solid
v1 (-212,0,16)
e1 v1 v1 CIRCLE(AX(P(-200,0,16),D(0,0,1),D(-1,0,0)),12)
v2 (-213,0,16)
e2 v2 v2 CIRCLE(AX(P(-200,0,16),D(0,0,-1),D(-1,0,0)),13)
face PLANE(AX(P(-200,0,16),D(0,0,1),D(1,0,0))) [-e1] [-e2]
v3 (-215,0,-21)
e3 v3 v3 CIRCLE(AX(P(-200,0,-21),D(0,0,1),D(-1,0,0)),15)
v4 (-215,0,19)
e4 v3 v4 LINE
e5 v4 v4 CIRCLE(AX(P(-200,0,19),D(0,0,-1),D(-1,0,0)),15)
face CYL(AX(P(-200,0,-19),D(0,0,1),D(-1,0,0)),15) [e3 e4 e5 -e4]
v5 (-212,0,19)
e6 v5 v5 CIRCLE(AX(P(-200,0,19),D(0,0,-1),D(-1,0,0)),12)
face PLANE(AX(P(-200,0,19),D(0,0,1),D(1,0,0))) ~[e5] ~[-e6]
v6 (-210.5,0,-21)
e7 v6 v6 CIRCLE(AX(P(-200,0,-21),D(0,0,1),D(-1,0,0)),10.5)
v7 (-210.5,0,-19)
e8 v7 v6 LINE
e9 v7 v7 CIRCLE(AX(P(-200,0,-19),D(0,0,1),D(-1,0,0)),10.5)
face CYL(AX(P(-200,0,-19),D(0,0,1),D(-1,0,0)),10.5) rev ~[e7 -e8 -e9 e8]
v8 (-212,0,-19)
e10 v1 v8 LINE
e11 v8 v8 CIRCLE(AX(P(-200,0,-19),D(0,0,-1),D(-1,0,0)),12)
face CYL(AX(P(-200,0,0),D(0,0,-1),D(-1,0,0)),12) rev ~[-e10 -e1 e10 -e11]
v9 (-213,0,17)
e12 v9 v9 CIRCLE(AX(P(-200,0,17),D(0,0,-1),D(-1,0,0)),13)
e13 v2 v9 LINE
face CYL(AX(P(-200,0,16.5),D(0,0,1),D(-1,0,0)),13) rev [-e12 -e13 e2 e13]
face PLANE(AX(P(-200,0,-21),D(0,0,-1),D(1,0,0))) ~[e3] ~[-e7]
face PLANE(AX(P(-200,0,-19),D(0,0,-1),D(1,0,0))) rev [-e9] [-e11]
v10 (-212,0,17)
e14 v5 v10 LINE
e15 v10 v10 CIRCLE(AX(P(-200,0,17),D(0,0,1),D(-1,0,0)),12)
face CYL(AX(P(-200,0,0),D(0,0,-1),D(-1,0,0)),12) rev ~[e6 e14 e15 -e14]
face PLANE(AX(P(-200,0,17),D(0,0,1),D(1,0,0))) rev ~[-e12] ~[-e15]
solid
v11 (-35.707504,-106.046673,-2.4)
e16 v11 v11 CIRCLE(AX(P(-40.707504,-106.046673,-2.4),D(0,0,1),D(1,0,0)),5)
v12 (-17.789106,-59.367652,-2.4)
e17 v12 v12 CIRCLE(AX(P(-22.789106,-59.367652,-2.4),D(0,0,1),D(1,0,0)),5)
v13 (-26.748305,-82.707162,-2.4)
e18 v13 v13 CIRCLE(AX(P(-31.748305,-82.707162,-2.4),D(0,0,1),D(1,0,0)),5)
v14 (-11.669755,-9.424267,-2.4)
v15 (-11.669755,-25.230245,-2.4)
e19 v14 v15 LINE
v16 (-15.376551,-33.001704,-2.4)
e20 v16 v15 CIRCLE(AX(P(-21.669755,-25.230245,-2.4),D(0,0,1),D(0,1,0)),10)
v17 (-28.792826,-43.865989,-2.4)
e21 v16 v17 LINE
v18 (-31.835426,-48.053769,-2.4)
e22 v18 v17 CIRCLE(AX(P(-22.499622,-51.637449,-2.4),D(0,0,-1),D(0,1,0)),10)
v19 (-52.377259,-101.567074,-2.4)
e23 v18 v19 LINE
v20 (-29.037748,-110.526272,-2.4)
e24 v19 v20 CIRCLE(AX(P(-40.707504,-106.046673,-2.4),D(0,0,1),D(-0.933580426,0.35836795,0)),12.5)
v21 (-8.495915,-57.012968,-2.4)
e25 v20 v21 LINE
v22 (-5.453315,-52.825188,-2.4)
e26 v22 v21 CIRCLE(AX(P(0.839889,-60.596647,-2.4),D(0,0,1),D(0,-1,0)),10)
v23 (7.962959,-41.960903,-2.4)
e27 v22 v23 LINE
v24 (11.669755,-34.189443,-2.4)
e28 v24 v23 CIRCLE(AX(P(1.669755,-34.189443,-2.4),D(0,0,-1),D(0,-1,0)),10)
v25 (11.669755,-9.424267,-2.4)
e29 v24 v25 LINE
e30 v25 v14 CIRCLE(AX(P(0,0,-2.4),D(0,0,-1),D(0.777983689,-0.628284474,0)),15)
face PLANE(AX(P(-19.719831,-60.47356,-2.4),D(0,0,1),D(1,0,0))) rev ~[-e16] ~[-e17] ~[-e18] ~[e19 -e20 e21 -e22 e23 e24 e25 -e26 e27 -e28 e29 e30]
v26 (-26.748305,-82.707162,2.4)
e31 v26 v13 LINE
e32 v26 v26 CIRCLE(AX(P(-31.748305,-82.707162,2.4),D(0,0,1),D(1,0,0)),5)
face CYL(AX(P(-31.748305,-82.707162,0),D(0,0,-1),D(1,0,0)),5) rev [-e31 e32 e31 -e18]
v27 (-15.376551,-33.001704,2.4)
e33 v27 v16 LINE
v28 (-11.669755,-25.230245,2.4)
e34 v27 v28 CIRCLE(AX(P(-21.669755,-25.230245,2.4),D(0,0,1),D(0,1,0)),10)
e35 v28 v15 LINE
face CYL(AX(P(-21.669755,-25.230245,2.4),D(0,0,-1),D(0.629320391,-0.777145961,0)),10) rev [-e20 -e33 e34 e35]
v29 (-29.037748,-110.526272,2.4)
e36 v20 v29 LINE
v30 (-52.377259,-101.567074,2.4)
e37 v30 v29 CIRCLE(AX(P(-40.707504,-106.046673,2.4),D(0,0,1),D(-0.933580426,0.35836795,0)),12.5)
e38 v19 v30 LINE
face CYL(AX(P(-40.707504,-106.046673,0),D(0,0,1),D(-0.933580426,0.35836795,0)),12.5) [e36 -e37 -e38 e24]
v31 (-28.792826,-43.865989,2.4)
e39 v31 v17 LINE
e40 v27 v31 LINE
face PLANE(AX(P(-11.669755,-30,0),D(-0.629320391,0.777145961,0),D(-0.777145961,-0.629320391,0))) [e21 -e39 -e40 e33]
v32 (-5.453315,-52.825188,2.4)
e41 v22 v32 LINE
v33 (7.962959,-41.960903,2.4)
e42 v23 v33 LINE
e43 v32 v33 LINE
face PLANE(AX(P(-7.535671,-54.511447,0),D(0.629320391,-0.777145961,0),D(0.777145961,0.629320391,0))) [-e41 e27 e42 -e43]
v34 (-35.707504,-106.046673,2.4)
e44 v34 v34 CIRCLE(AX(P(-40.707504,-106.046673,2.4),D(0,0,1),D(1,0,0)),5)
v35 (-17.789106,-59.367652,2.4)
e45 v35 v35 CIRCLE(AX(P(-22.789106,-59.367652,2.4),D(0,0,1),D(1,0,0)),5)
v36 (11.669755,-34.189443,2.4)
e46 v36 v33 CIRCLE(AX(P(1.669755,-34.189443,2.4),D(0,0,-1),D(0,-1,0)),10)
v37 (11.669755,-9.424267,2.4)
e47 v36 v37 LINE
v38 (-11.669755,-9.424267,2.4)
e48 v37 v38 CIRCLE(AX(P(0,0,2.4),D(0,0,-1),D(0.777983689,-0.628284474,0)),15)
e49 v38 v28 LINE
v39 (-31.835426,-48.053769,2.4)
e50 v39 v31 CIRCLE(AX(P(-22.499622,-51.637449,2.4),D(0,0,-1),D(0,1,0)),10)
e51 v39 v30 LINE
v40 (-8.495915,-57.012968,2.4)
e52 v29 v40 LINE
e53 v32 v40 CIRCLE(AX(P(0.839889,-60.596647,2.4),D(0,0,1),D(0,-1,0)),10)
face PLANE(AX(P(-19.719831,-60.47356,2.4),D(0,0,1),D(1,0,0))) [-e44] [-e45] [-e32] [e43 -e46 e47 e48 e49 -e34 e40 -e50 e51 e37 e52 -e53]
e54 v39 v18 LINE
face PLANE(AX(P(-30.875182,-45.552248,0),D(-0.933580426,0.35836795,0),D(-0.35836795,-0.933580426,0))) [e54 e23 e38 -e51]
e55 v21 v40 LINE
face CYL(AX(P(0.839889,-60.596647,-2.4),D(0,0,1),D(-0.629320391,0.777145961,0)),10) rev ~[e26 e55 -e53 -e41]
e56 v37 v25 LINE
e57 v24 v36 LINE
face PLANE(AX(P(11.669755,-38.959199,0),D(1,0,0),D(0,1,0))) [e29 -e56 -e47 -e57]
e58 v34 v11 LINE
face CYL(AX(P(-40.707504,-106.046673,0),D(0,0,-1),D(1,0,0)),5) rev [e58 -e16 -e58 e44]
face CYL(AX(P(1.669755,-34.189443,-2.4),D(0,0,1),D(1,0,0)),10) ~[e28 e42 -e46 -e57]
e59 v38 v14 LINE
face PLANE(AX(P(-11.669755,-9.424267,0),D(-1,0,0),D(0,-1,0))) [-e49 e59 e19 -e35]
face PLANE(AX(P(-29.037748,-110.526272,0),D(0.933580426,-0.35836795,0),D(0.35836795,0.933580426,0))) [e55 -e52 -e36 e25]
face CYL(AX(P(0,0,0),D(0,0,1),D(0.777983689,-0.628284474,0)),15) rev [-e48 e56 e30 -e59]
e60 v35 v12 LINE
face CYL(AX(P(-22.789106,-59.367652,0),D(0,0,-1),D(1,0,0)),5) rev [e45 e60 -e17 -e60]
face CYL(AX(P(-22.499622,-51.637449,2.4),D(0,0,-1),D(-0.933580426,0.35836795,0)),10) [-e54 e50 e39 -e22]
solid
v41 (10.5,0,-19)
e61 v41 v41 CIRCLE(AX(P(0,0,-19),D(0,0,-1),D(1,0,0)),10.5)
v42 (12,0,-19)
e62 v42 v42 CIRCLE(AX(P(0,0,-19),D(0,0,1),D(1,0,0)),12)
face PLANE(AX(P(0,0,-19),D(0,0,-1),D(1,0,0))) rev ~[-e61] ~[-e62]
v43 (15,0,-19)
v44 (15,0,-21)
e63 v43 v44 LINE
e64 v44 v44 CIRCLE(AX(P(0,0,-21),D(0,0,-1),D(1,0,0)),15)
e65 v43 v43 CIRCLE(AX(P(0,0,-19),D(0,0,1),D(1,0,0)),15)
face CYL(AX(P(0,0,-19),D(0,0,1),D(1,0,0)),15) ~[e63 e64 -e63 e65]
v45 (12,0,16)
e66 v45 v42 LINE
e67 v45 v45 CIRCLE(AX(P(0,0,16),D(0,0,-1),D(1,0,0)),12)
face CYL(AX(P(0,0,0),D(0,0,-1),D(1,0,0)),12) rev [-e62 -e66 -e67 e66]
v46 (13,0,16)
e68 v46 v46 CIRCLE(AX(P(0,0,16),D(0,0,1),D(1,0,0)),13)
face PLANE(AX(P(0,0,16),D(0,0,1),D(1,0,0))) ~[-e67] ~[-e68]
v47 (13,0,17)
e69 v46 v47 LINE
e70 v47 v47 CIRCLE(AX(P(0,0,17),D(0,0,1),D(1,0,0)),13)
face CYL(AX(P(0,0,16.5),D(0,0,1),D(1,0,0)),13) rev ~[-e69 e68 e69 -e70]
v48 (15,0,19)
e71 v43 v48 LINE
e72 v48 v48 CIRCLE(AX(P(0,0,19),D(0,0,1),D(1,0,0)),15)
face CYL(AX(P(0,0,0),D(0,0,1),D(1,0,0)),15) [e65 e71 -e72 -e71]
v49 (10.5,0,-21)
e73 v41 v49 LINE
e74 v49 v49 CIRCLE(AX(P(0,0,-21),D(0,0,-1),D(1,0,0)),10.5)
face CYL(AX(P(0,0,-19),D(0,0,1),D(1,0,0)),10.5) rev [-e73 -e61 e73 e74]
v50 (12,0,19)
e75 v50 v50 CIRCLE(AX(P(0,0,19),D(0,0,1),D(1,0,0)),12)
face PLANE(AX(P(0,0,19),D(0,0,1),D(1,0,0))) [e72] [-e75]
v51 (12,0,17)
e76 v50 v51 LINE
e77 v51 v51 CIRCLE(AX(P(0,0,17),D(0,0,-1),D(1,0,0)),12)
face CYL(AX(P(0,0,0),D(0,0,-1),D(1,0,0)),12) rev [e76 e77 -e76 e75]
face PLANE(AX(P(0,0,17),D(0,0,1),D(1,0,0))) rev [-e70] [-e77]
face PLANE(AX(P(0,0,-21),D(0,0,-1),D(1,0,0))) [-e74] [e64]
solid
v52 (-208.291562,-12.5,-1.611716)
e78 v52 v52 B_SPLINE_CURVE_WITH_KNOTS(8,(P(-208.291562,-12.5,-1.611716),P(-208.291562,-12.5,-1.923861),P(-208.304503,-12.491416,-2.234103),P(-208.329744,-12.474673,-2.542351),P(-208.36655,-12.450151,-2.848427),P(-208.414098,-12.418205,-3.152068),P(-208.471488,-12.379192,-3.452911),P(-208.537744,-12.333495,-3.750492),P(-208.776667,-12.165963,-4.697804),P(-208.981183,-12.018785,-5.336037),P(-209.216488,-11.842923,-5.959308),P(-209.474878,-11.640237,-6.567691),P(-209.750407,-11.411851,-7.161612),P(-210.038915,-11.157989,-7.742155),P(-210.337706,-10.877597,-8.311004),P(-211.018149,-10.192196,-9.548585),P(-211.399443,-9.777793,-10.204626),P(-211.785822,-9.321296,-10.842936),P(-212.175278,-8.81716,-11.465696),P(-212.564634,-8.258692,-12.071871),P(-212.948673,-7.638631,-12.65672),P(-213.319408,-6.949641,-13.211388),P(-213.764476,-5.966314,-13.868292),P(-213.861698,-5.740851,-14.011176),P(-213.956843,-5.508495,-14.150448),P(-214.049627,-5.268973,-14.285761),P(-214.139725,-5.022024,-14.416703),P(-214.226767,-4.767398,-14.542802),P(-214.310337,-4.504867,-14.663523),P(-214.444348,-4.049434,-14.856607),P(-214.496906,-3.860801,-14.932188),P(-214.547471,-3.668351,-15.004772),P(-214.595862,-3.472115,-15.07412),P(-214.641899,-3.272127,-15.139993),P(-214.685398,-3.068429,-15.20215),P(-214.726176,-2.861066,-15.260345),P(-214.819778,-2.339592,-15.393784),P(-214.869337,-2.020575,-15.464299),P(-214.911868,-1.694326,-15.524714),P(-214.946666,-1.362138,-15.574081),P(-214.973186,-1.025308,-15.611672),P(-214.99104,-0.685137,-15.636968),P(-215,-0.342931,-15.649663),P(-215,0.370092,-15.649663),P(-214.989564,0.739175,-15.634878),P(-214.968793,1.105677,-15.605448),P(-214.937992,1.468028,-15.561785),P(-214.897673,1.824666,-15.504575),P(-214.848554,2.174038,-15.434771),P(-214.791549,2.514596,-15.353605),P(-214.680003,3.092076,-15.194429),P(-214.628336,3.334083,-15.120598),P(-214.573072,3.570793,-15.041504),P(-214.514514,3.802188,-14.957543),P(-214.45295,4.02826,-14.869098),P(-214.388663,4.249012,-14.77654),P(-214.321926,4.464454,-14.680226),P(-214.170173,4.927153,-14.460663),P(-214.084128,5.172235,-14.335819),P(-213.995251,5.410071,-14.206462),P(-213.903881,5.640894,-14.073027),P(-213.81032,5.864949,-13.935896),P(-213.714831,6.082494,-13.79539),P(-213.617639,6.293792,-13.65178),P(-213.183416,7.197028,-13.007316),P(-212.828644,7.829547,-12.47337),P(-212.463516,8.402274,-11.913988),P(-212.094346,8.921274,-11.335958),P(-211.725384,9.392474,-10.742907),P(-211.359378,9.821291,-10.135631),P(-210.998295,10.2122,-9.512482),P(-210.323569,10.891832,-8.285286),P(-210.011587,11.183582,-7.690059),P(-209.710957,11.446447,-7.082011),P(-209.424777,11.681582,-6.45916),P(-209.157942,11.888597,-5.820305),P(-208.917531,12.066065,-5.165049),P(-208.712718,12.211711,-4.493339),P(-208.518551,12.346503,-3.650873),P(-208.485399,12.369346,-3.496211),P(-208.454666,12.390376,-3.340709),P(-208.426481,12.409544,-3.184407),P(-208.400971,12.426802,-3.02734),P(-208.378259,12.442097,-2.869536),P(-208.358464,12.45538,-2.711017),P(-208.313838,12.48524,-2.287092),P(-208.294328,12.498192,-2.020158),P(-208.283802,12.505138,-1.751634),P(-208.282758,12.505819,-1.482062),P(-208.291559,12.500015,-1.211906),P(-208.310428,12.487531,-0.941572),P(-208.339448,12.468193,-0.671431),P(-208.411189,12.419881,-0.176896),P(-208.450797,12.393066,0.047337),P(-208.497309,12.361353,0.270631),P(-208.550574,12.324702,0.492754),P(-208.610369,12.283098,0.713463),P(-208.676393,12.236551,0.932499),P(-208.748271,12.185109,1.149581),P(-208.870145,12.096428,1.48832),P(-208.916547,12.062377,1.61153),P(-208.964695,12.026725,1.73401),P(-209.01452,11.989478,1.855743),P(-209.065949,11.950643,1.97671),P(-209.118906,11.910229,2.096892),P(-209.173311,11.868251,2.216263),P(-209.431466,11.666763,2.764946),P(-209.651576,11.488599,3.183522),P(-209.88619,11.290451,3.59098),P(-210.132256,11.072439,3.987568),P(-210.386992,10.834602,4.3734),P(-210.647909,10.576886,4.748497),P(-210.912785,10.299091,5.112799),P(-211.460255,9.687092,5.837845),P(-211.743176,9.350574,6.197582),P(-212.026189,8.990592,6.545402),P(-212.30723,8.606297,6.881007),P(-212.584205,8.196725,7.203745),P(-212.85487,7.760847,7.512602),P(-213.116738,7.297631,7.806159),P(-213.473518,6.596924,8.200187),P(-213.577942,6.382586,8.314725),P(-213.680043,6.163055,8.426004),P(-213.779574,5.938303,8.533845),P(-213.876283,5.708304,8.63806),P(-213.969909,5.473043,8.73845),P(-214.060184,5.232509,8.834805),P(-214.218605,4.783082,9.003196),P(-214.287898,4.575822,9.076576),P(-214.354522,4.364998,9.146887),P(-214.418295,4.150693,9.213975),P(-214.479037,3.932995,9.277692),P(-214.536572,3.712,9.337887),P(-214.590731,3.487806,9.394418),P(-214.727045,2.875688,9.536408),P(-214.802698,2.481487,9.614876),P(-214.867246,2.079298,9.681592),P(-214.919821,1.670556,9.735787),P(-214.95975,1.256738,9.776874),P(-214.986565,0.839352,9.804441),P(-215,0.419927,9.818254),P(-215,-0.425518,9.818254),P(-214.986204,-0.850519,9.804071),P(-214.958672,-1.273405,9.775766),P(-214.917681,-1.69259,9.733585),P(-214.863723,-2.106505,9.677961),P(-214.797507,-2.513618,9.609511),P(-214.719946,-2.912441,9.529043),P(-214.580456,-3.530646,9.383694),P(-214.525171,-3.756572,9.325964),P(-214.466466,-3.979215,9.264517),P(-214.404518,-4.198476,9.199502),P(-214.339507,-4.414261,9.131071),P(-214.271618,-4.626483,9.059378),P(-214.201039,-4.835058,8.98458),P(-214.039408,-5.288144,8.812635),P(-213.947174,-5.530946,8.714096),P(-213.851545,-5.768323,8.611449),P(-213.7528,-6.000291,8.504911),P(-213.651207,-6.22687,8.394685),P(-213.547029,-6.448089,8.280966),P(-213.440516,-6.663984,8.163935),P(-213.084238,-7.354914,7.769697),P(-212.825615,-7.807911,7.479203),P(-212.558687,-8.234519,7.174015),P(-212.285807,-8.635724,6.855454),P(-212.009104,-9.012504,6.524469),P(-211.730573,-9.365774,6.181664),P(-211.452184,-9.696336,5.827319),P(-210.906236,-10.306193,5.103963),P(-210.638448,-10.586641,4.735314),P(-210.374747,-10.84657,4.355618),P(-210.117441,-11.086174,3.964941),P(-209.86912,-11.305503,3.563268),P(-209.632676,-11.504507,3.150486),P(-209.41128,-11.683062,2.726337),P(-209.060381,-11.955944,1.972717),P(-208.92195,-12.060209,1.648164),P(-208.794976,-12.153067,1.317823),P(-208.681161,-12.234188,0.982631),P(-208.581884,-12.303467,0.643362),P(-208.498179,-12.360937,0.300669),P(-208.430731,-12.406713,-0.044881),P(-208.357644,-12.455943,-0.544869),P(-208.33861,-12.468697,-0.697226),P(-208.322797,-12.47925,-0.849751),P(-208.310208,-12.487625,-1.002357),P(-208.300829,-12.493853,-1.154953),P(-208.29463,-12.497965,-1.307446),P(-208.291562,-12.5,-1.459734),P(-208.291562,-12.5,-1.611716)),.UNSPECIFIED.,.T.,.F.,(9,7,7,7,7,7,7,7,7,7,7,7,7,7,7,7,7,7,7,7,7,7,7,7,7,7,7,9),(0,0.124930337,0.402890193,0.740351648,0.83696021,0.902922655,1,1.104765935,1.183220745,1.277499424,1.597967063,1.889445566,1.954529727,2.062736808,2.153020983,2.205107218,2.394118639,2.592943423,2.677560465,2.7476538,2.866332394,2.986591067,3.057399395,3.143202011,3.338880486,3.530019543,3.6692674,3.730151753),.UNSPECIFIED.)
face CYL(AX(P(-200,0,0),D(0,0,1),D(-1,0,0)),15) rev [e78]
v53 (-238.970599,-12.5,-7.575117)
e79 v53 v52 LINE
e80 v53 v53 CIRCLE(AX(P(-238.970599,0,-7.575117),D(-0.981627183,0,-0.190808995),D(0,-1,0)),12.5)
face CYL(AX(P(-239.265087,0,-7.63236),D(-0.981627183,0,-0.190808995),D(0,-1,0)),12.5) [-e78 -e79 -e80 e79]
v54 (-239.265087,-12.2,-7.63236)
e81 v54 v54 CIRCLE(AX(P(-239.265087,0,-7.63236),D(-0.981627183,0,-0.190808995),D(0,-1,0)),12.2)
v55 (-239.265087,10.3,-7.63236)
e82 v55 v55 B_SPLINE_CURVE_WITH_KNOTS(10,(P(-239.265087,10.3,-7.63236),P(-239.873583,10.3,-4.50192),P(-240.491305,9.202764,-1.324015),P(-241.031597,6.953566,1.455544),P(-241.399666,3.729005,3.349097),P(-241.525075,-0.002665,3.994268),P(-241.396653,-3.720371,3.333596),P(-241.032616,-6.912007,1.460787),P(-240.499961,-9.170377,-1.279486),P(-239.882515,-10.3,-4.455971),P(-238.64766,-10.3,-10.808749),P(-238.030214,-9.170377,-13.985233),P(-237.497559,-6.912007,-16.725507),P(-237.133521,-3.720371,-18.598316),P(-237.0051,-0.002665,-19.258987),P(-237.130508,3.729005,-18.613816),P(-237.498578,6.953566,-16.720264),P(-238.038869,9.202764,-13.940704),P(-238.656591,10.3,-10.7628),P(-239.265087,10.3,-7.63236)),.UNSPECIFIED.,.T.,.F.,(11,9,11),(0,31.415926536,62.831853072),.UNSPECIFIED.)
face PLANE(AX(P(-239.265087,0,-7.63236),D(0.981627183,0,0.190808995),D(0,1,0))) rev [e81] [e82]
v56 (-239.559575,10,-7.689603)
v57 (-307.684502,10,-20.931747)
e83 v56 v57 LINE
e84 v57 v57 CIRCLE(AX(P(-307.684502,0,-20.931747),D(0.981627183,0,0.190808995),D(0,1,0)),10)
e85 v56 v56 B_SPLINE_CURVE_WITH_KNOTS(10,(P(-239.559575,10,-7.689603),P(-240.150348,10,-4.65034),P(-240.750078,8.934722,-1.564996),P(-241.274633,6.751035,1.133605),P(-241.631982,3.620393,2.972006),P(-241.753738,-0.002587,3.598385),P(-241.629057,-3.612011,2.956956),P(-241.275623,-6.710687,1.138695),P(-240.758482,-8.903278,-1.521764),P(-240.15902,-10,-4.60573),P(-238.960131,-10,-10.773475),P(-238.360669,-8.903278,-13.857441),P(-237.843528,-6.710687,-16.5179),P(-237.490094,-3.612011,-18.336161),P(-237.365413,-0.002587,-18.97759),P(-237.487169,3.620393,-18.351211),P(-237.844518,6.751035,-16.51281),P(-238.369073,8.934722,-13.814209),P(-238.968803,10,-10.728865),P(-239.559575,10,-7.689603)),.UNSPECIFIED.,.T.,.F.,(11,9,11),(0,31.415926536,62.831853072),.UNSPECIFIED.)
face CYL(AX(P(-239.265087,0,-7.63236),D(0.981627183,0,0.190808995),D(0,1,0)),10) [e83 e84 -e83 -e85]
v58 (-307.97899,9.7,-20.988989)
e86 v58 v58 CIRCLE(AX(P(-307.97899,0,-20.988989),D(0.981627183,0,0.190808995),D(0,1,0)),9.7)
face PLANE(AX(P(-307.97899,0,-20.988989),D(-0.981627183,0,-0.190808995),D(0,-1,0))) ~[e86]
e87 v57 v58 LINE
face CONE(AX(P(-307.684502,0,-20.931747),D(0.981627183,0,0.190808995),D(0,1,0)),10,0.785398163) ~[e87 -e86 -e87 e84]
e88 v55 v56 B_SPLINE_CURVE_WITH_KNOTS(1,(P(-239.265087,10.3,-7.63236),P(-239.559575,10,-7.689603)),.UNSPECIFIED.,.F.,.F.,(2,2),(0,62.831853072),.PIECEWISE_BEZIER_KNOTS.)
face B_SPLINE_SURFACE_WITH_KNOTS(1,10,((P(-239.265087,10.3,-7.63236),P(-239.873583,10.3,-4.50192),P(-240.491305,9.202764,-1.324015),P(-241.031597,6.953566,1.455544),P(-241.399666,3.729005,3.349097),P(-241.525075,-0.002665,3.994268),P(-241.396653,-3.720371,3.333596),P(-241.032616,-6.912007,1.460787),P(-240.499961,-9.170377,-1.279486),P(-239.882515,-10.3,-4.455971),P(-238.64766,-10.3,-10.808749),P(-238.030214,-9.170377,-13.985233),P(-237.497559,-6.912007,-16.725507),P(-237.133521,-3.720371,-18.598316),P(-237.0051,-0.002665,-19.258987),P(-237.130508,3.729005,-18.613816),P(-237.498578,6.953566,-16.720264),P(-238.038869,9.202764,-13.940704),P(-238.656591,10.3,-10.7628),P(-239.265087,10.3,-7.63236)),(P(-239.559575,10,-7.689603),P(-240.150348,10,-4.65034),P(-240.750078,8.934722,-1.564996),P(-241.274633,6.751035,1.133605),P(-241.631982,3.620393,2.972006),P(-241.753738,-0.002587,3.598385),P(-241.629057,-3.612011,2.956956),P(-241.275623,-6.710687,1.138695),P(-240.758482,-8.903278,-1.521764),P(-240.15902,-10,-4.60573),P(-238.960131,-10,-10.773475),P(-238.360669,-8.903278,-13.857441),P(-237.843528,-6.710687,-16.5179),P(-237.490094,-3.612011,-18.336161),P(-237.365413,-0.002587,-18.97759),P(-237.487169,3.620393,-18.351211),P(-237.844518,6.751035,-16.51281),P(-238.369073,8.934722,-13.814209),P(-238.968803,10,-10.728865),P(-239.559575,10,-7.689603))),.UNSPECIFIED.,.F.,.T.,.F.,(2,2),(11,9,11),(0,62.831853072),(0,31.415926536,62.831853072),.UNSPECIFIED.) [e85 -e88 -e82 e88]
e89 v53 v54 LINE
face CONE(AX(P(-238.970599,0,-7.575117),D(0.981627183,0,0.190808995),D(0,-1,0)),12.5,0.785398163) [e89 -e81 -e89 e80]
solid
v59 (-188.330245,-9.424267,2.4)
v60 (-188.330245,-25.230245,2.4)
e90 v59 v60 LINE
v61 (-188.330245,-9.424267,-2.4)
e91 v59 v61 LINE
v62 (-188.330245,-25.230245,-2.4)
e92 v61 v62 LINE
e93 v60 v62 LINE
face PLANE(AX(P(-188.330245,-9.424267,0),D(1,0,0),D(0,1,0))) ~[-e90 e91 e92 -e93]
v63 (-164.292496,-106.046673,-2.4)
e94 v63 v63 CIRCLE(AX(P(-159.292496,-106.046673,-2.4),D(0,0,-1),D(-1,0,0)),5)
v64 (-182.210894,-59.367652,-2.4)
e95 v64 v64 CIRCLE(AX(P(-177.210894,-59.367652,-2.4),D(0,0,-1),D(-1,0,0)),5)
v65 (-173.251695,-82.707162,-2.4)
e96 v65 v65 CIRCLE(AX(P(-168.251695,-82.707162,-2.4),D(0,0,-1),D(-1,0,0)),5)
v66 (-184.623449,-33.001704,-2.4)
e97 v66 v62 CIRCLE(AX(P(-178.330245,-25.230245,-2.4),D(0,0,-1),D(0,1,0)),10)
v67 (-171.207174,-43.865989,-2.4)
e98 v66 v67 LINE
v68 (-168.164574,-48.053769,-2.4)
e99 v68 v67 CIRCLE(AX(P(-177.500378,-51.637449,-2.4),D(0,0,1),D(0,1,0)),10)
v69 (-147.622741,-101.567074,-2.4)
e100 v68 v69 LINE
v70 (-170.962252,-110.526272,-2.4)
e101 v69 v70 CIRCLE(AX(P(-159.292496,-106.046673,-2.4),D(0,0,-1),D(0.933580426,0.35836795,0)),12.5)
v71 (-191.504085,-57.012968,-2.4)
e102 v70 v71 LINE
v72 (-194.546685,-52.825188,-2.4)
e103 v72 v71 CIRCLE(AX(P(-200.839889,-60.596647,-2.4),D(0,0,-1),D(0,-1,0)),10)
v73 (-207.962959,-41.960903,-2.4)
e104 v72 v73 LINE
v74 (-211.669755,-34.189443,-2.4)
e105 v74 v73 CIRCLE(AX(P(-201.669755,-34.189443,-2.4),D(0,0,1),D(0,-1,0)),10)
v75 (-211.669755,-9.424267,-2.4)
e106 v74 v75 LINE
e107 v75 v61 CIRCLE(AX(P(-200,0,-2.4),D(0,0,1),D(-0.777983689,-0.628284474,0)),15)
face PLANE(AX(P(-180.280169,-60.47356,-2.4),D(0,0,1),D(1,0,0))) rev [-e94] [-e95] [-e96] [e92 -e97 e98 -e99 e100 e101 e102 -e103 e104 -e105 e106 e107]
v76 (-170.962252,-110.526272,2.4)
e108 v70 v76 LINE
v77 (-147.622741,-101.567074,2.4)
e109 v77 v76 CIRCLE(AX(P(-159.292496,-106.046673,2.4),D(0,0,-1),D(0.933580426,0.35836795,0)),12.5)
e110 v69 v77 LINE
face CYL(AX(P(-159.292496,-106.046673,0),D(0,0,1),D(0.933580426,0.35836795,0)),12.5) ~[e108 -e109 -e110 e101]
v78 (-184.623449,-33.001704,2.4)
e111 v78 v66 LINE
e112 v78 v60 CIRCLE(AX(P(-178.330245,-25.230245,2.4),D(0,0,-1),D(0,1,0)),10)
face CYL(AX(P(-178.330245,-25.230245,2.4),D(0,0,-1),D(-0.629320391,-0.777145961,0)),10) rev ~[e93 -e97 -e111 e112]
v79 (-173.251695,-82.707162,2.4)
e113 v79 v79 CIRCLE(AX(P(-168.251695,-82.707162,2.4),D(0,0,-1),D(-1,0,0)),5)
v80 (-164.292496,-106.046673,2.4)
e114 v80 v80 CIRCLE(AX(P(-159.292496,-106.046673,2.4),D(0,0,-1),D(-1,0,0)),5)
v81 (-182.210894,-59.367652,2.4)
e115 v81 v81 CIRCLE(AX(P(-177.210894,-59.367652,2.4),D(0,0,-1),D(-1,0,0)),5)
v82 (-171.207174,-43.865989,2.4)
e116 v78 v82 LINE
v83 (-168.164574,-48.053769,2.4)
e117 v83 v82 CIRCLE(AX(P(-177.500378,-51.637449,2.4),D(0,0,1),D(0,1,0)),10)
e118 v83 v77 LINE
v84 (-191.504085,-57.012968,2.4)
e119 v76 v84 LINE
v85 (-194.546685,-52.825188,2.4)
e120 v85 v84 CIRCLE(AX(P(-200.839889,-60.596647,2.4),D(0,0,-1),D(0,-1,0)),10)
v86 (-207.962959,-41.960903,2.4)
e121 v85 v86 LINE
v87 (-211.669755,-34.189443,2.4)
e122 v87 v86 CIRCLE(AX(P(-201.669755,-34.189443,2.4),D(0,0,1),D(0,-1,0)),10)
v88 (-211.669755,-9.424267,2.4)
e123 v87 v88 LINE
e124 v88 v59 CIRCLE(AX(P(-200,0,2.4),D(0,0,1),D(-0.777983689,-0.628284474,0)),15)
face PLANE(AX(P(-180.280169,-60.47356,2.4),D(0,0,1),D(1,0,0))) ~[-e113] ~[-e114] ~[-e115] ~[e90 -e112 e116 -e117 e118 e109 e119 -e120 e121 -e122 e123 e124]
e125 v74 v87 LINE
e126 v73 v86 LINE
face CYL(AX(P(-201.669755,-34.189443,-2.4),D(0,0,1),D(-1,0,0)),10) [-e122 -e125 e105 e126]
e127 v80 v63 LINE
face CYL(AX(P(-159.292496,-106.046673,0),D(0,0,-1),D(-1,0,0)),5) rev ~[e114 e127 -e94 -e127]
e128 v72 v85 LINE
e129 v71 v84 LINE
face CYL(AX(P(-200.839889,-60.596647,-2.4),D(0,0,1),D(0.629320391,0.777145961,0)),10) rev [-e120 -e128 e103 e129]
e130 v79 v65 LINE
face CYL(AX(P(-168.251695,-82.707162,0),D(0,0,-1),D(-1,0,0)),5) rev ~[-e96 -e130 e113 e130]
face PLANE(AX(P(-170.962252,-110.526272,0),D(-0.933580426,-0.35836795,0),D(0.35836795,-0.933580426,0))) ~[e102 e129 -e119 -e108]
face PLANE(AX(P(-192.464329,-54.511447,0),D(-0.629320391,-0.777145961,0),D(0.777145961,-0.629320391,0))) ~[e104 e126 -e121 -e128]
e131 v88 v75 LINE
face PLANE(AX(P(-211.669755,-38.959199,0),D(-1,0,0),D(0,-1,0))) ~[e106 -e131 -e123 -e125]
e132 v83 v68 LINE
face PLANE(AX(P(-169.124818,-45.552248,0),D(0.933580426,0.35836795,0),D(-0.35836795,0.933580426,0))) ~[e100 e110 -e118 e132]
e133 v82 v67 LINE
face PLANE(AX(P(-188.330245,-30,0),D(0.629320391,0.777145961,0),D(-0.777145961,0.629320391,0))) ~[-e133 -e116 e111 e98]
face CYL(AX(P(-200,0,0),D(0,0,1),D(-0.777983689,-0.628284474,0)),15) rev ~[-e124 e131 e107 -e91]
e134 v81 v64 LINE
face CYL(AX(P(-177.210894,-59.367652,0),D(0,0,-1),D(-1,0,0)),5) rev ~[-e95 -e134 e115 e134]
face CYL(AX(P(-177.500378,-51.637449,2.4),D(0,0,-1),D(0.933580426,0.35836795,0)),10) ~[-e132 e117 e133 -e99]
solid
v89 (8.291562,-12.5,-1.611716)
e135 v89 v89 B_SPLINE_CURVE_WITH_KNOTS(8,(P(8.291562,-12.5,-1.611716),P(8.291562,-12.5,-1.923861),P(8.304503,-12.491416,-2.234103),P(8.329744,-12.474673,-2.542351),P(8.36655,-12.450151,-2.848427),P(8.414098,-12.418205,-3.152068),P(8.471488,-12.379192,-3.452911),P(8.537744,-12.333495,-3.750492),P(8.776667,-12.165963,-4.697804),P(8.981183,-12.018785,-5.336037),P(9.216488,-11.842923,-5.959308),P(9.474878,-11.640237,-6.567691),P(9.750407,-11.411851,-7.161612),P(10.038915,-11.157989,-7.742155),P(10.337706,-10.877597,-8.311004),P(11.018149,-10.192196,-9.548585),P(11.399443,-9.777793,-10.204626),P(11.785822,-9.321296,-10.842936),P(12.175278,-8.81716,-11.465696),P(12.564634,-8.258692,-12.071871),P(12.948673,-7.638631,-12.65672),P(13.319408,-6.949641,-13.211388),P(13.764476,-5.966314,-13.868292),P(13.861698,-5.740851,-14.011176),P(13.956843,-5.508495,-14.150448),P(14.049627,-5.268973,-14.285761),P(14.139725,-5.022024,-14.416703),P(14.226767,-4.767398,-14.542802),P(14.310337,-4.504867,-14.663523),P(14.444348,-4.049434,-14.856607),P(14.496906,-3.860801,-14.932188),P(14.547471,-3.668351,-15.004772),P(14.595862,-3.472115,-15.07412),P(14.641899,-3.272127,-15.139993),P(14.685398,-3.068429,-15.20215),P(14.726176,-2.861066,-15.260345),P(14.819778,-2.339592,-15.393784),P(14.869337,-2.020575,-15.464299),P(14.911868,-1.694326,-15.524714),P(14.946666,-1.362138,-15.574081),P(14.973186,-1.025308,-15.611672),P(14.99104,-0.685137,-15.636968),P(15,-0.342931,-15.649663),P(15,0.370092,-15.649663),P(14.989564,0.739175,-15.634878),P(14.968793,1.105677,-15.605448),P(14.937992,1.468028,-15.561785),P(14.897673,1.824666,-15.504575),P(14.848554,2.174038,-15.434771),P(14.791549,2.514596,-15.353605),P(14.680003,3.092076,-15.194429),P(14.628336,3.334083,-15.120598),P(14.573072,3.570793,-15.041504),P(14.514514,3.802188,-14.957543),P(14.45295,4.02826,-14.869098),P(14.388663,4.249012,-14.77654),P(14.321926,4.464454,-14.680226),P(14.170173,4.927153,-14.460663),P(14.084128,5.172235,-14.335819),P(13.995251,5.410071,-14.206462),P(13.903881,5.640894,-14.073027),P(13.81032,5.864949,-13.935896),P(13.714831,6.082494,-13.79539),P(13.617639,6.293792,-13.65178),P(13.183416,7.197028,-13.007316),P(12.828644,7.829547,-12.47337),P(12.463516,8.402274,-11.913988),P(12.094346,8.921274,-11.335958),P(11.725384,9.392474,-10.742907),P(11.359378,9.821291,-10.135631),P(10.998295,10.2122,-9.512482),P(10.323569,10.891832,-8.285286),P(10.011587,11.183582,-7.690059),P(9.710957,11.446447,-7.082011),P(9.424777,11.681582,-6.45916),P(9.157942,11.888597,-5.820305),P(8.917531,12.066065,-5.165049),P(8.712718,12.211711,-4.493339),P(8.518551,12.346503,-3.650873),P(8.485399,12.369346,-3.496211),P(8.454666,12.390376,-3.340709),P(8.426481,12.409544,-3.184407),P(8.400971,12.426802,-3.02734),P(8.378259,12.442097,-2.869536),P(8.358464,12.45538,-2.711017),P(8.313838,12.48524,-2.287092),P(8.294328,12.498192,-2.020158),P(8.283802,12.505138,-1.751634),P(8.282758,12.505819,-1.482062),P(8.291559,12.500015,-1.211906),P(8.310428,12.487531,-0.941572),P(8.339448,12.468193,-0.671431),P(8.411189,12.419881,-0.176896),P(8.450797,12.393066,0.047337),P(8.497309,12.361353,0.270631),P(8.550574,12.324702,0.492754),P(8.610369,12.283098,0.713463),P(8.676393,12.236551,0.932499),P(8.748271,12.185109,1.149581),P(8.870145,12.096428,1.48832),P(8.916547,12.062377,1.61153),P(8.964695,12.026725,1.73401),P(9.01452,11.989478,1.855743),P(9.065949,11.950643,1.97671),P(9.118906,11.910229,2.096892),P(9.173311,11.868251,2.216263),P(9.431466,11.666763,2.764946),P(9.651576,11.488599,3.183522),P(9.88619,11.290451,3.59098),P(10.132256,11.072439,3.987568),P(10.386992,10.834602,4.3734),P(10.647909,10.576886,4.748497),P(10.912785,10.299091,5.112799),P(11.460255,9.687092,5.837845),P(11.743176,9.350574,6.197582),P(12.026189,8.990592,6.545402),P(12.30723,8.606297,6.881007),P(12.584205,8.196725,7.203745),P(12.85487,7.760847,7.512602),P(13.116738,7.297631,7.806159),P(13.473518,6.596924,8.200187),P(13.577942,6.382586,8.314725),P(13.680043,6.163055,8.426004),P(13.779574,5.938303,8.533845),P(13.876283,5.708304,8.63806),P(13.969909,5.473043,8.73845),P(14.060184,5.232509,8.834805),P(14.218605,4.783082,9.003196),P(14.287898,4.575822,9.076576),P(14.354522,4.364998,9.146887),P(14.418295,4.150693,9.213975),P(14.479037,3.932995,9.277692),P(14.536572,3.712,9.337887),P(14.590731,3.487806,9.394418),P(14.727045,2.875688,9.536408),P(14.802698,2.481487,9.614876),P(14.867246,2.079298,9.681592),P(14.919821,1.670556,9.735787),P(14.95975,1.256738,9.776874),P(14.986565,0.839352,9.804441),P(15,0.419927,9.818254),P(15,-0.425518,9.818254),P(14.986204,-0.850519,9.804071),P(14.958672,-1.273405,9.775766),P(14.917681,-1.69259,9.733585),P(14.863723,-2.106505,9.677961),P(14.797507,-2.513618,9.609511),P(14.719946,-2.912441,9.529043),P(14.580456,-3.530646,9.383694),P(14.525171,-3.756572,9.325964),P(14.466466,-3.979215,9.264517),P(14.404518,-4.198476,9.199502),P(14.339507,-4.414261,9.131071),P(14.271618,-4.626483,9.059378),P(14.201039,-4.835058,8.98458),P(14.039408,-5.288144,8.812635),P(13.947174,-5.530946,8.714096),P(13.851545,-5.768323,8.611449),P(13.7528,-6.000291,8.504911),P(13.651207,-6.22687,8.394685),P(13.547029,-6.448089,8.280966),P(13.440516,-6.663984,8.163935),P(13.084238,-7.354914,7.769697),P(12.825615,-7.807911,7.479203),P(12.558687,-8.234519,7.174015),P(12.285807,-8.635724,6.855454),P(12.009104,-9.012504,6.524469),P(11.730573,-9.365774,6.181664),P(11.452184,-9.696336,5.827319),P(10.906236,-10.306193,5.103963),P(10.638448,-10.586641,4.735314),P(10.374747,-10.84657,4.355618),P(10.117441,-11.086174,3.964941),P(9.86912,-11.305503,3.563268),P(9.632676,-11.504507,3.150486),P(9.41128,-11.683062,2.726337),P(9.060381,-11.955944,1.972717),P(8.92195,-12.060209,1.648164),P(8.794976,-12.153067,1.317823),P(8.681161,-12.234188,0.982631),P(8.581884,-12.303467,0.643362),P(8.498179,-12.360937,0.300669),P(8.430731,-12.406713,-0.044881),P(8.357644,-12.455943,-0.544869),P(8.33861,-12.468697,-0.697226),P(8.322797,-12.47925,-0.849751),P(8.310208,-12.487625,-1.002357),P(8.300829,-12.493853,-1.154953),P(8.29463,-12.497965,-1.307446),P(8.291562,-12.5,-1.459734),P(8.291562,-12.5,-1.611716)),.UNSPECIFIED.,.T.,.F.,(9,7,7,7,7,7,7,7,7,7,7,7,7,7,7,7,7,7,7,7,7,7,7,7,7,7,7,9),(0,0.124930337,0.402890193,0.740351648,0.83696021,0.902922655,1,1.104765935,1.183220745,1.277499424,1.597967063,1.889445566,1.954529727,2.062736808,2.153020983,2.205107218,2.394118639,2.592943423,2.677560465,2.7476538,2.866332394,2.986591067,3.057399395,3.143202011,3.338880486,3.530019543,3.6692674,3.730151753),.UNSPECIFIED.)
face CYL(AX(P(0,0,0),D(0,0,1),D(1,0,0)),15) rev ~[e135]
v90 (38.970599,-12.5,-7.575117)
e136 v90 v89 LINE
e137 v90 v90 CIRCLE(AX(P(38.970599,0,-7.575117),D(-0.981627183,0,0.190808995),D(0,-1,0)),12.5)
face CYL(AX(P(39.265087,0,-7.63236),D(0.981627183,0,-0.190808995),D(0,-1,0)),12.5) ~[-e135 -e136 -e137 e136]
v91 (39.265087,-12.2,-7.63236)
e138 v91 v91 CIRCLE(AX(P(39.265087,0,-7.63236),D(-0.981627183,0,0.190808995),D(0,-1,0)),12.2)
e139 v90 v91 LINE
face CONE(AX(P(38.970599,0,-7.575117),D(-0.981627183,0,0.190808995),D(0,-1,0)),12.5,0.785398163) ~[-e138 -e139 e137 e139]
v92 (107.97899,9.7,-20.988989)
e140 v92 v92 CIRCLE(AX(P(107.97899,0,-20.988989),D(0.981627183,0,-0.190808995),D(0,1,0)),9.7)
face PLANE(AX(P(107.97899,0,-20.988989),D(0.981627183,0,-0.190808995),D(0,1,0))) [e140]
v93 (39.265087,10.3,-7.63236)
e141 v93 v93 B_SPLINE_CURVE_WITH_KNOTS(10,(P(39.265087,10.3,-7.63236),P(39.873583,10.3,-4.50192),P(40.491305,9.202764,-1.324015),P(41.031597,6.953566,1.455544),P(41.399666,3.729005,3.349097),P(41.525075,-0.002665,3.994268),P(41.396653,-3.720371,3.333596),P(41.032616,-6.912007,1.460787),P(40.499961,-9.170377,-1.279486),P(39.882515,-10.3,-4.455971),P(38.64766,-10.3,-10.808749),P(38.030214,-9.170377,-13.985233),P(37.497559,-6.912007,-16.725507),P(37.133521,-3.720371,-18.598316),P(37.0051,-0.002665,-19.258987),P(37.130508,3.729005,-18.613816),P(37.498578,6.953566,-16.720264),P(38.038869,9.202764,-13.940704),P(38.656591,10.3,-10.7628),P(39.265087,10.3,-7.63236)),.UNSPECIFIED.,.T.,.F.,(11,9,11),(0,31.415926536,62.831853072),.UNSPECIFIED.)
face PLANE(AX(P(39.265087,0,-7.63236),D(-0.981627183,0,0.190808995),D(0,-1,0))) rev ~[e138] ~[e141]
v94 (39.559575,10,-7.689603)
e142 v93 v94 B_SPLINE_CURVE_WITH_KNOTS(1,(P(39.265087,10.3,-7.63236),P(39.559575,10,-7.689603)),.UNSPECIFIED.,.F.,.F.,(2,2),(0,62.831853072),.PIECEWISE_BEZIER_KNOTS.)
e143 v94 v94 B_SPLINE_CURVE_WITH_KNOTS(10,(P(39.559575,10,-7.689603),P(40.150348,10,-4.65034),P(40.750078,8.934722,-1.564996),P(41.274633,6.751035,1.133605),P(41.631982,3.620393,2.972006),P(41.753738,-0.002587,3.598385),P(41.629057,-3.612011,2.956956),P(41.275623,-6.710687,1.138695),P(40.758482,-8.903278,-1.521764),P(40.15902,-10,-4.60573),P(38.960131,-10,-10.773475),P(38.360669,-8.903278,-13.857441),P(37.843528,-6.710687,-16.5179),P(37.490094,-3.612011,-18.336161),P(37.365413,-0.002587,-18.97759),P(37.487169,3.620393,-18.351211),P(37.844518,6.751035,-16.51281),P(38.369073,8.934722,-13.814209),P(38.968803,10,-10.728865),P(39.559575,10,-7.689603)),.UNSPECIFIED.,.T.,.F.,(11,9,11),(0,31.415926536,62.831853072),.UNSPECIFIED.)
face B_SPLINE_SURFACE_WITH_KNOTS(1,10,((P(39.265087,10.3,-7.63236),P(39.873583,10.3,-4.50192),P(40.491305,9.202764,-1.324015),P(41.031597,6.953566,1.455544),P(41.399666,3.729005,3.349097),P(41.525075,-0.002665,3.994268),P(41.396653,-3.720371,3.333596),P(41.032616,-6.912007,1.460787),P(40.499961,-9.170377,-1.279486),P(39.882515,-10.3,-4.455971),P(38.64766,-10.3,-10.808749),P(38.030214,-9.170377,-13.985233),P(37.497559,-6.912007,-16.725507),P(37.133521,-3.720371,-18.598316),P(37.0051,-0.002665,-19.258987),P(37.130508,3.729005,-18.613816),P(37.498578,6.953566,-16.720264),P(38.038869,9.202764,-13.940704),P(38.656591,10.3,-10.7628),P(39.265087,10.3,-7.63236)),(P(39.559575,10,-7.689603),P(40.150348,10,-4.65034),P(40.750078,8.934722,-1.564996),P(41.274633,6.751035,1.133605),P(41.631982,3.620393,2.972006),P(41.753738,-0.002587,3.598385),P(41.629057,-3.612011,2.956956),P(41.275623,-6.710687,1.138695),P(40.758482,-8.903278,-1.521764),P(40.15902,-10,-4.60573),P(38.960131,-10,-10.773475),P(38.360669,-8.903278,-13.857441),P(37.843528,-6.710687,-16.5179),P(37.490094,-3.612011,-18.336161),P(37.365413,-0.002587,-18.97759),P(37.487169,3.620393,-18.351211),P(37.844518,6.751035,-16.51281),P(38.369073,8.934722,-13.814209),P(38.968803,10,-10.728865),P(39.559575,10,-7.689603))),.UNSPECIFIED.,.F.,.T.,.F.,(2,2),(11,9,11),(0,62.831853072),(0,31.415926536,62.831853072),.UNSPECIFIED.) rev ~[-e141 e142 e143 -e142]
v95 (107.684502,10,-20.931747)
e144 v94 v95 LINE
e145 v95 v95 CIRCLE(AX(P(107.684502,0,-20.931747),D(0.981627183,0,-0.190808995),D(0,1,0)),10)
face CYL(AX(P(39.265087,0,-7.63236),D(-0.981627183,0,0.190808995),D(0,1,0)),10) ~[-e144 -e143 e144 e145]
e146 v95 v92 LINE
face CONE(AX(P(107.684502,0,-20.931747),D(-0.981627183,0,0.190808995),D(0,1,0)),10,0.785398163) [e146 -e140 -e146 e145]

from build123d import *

# Parameters (mm, degrees)
F0_R      = 15
F0_R_2    = 12
F1_DEPTH  = 19
F2_R      = 15
F2_R_2    = 10.5
F3_DEPTH  = 2
F4_W      = 2
F4_H      = 1
F7_R      = 10
F8_DEPTH  = 70
F10_ANGLE = -11
F11_R     = 12.5
F12_REACH = 93.7061177232
F13_SIZE  = 0.3
F14_R     = 5
F15_DEPTH = 2.4
F16_R     = 10


with BuildPart() as f1:
    # F0 (on Top) → F1 (new body, symmetric)
    with BuildSketch(Plane.XY):
        Circle(F0_R)
        Circle(F0_R_2, mode=Mode.SUBTRACT)
    extrude(amount=F1_DEPTH, both=True)

    # F2 (on face) → F3 (join)
    with BuildSketch(Plane(origin=(0, 0, -19), x_dir=(1, 0, 0), z_dir=(0, 0, -1))):
        Circle(F2_R)
        Circle(F2_R_2, mode=Mode.SUBTRACT)
    extrude(amount=F3_DEPTH)

    # F4 (on Front) → F5 (revolve, cut)
    with BuildSketch(Plane.XZ):
        with Locations((12, 16.5)):
            Rectangle(F4_W, F4_H)
    revolve(axis=Axis((0, 0, 8.6649929517), (0, 0, 1)), mode=Mode.SUBTRACT)


with BuildPart() as f8:
    # F7 (on offset) → F8 (new body)
    with BuildSketch(Plane.YZ.offset(40)):
        Circle(F7_R)
    extrude(amount=F8_DEPTH)


with BuildPart() as f8_1:
    # F10: moved
    add(f8.part.rotate(Axis((0, -48.5732145607, 0), (0, -1, 0)), F10_ANGLE))

    f12_end = f1.part.faces().sort_by_distance((-15, 0, -1))[0]
    # F11 (on face) → F12 (join, up to a face of F1 that its end follows)
    with BuildSketch(Plane(origin=(39.2650873379, 0, -7.6323598151), x_dir=(0, -1, 0), z_dir=(-0.9816271834, 0, 0.1908089954))):
        Circle(F11_R)
    f12_long = extrude(amount=F12_REACH, mode=Mode.PRIVATE)
    add(split(f12_long, bisect_by=f12_end, keep=Keep.ALL, mode=Mode.PRIVATE).solids().sort_by_distance((39.2650873379, 0, -7.6323598151))[0])

    # F13
    f13_edges = [f8_1.edges().sort_by_distance(p)[0] for p in [
        (39.265087, -10, -7.63236),
        (107.97899, -10, -20.988989),
        (39.265087, 12.5, -7.63236),
    ]]
    chamfer(f13_edges, length=F13_SIZE)


with BuildPart() as f15:
    # F14 (on Top) → F15 (new body, symmetric)
    with BuildSketch(Plane.XY):
        with BuildLine():
            Line((-30.875182133, -45.5522479748), (-52.3772591057, -101.5670735646))
            ThreePointArc((-52.3772591057, -101.5670735646), (-45.1871031438, -117.7164282651), (-29.0377484433, -110.5262723032))
            Line((-29.0377484433, -110.5262723032), (-7.5356714706, -54.5114467134))
            Line((-7.5356714706, -54.5114467134), (11.6697553312, -38.9591987386))
            Line((11.6697553312, -38.9591987386), (11.6697553312, -9.4242671073))
            ThreePointArc((11.6697553312, -9.4242671073), (0, -15), (-11.6697553312, -9.4242671073))
            Line((-11.6697553312, -9.4242671073), (-11.6697553312, -30))
            Line((-11.6697553312, -30), (-30.875182133, -45.5522479748))
        make_face()
        with Locations((-40.7075037745, -106.0466729339)):
            Circle(F14_R, mode=Mode.SUBTRACT)
        with Locations((-31.7483050359, -82.7071622715)):
            Circle(F14_R, mode=Mode.SUBTRACT)
        with Locations((-22.7891062972, -59.3676516091)):
            Circle(F14_R, mode=Mode.SUBTRACT)
    extrude(amount=F15_DEPTH, both=True)

    # F16
    f16_edges = [f15.edges().sort_by_distance(p)[0] for p in [
        (-7.535671, -54.511447, 0),
        (11.669755, -38.959199, 0),
        (-30.875182, -45.552248, 0),
        (-11.669755, -30, 0),
    ]]
    fillet(f16_edges, radius=F16_R)


with BuildPart() as f18_1:
    # F18: instance of F8
    add(f8_1.part.mirror(Plane.YZ.offset(-100)))


with BuildPart() as f18_2:
    # F18: instance of F1
    add(f1.part.mirror(Plane.YZ.offset(-100)))


with BuildPart() as f18_3:
    # F18: instance of F15
    add(f15.part.mirror(Plane.YZ.offset(-100)))


solid = Compound([f1.part, f8_1.part, f15.part, f18_1.part, f18_2.part, f18_3.part])
